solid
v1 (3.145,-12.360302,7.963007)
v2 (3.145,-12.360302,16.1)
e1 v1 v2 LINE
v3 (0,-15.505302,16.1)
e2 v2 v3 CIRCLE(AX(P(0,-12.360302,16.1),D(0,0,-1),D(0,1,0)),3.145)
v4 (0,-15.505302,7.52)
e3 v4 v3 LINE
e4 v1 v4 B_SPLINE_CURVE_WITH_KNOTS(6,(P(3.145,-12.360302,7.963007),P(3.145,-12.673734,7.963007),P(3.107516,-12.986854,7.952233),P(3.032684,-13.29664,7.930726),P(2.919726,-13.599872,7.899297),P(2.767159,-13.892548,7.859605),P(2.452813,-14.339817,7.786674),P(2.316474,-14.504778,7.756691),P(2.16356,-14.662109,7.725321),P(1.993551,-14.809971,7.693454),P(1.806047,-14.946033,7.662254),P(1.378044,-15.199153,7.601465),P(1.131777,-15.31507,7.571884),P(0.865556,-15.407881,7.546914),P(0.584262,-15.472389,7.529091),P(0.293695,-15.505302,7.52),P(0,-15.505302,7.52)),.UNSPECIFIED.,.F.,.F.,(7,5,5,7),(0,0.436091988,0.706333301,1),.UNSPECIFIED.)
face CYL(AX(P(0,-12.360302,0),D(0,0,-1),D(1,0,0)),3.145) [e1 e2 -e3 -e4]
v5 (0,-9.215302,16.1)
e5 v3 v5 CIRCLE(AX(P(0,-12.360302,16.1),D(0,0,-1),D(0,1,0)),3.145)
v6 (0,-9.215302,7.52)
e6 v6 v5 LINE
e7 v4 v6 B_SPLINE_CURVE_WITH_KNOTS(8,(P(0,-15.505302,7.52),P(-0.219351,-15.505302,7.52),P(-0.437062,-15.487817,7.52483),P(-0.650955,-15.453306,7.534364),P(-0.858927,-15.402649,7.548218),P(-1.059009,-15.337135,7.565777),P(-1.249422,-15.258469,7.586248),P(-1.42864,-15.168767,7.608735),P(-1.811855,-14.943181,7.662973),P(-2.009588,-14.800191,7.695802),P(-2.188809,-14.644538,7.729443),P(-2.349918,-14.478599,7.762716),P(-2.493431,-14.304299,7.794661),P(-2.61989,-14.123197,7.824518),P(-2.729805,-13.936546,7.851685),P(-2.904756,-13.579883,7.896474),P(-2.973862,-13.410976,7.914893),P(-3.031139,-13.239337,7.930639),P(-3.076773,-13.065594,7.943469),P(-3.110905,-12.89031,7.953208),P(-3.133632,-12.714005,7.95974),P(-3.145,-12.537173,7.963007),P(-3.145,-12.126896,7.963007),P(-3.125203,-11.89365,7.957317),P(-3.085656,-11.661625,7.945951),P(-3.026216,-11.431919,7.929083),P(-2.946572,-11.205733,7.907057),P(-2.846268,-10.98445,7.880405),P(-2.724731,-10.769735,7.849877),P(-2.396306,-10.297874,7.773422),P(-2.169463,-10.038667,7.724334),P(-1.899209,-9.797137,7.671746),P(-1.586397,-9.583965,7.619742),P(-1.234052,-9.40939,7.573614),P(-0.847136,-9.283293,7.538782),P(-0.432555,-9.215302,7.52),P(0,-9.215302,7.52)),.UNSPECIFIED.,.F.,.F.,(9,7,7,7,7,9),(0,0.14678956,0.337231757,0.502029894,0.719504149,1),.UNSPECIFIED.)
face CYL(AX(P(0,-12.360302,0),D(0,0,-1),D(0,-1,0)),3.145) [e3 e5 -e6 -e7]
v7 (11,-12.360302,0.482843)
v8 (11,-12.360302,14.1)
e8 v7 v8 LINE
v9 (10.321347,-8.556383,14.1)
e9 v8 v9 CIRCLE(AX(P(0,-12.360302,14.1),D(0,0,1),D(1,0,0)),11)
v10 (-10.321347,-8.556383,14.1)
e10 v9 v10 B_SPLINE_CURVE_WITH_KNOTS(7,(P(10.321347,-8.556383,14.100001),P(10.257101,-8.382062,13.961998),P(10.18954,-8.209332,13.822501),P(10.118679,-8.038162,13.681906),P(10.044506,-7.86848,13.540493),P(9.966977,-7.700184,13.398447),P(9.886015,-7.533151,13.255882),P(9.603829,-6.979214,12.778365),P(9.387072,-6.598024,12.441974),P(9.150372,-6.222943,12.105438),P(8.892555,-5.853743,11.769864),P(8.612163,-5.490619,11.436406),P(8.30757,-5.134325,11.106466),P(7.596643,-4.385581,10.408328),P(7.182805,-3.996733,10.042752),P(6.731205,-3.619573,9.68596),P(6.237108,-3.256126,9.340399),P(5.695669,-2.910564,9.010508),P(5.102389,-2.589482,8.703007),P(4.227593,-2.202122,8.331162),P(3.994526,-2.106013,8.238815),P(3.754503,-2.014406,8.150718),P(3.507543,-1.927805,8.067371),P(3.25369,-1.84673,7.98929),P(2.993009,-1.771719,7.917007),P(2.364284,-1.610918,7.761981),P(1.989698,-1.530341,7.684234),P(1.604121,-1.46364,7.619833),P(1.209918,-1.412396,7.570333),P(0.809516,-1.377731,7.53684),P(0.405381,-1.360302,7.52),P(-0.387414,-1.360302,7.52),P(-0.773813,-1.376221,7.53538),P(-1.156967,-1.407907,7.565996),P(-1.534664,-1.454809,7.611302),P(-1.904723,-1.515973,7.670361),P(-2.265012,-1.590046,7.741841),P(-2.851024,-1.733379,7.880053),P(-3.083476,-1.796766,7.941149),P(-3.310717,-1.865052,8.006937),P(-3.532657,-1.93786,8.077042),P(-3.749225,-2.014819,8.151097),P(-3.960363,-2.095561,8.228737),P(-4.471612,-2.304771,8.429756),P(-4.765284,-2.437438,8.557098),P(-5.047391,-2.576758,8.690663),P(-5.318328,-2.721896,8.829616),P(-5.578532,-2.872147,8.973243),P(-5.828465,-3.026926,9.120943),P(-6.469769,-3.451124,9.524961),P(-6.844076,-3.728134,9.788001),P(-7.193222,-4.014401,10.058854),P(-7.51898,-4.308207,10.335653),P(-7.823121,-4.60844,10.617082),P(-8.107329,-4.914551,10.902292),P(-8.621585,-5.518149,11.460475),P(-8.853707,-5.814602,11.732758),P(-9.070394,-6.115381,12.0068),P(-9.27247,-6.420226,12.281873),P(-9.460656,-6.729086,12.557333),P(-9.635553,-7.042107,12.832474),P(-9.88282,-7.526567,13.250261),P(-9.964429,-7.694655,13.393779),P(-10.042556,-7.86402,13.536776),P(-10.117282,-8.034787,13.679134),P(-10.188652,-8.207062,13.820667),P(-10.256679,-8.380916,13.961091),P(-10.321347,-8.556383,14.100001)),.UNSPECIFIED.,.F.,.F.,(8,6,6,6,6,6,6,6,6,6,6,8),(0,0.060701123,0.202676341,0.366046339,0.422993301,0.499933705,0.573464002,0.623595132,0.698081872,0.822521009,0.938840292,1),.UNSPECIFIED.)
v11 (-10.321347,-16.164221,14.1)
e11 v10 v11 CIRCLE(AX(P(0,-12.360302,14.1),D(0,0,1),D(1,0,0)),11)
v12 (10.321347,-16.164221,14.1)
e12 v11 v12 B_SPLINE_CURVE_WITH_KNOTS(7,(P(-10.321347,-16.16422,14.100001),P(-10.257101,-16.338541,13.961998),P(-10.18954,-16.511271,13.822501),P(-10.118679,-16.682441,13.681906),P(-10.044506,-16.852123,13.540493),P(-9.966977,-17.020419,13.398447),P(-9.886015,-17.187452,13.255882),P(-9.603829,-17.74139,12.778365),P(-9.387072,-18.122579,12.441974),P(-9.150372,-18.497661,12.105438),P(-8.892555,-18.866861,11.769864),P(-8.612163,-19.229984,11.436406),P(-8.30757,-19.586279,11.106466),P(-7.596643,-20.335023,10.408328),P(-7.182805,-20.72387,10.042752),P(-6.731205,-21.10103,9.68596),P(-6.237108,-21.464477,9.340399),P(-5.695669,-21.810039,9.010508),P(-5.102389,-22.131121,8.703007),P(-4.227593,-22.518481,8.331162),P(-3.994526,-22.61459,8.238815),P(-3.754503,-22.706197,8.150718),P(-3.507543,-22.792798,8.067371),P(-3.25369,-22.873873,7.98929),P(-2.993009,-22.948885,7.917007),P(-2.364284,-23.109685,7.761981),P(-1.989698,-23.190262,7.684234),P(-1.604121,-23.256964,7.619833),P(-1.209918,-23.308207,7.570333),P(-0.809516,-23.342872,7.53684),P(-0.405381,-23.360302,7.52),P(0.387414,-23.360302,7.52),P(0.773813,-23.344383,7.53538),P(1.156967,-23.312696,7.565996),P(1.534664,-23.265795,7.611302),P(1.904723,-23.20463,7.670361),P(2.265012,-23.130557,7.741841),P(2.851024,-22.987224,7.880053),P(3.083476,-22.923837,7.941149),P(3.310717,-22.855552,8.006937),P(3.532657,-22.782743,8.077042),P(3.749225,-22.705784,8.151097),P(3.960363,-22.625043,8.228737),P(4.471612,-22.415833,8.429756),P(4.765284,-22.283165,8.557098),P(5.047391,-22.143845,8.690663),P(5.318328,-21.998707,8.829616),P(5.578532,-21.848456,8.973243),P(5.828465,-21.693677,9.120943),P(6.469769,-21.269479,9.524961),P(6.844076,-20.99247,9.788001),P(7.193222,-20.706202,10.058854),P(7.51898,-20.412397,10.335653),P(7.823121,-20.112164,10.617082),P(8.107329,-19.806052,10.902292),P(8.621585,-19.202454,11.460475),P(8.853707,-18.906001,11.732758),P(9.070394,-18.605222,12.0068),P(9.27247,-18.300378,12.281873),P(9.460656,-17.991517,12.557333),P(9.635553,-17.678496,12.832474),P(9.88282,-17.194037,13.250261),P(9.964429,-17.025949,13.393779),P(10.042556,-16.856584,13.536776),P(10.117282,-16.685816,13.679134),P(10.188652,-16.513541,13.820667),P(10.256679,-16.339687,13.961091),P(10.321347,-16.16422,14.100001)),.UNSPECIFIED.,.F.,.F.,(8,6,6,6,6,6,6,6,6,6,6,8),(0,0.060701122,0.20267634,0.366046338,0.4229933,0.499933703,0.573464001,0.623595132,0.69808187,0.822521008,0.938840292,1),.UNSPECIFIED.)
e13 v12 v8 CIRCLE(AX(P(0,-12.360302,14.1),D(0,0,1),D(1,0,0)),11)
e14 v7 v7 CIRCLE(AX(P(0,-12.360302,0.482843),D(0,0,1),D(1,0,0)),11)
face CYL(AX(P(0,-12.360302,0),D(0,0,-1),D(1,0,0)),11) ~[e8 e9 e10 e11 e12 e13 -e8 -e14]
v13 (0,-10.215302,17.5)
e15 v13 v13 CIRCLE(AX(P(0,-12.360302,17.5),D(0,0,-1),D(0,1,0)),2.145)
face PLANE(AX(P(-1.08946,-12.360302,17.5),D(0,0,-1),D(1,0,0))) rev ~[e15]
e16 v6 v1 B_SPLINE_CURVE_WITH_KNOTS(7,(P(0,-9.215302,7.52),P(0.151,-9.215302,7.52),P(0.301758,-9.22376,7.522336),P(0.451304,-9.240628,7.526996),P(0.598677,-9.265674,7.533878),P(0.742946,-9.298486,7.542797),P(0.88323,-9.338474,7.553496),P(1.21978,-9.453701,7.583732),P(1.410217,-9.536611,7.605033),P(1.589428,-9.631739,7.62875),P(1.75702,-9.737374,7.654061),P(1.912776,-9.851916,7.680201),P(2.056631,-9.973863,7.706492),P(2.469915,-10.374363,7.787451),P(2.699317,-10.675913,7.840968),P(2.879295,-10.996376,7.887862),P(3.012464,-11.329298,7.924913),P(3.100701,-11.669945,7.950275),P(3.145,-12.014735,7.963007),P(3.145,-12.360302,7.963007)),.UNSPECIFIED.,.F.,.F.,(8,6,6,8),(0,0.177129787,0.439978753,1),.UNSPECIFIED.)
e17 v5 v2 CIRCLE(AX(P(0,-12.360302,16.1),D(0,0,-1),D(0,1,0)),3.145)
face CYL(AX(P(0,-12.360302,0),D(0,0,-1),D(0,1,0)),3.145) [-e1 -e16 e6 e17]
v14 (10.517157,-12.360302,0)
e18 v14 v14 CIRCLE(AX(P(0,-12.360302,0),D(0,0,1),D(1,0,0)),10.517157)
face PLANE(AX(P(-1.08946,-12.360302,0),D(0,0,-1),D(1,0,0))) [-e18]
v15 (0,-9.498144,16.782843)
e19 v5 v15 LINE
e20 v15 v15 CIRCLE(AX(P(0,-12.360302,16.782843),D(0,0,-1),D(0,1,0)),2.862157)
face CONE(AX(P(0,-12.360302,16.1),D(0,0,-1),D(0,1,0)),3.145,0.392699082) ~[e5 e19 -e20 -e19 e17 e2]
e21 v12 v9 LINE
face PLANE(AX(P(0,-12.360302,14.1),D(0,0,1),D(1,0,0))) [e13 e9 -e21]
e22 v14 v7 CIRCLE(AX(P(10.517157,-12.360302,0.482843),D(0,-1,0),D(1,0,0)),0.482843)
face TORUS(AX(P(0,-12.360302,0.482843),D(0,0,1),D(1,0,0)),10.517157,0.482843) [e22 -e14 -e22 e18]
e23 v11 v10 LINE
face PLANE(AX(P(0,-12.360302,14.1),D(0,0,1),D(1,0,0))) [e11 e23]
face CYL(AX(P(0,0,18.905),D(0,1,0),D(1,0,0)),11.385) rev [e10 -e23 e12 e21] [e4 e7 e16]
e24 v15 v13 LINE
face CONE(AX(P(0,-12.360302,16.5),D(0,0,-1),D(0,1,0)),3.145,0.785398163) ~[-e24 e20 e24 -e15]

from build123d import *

# Parameters (mm, degrees)
F0_R     = 11
F1_DEPTH = 14.1
F2_R     = 11.385
F3_DEPTH = 28.4
F5_DEPTH = 17.5
F7_R     = 0.4828427125


# Not quite as in the source:
# - a fillet or chamfer that OpenCascade refuses, or shapes differently, is made with other operations: its cross-section is extruded or revolved along the edge and cut away or added


with BuildPart() as f1:
    # F0 (on Top) → F1 (new body)
    with BuildSketch(Plane.XY):
        with Locations((0, -12.3603016903)):
            Circle(F0_R)
    extrude(amount=F1_DEPTH)

    # F2 (on Front) → F3 (cut)
    with BuildSketch(Plane.XZ):
        with Locations((0, 18.905)):
            Circle(F2_R)
    extrude(amount=F3_DEPTH, mode=Mode.SUBTRACT)

    # F4 (on face) → F5 (join)
    with BuildSketch(Plane(origin=(0, 0, 0), x_dir=(1, 0, 0), z_dir=(0, 0, -1))):
        with BuildLine():
            ThreePointArc((0, 15.5053016903), (-3.145, 12.3603016903), (0, 9.2153016903))
            Line((0, 9.2153016903), (0, 15.5053016903))
        make_face()
        with BuildLine():
            Line((0, 15.5053016903), (0, 9.2153016903))
            ThreePointArc((0, 9.2153016903), (2.2238508268, 10.1364508634), (3.145, 12.3603016903))
            ThreePointArc((3.145, 12.3603016903), (2.2238508268, 14.5841525171), (0, 15.5053016903))
        make_face()
    extrude(amount=-F5_DEPTH)

    # F6: chamfer of 1 on 1 edges, made by hand

    # F6_s1 → F6_t2 (revolve, cut)
    with BuildSketch(Plane.YZ):
        Polygon((-9.2153016903, 16.5), (-10.2153016903, 17.5), (-9.2153016903, 17.5), align=None)
    revolve(axis=Axis((0, -12.3603016903, 17.5), (0, 0, -1)), mode=Mode.SUBTRACT)

    # F7
    f7_edges = [f1.edges().sort_by_distance(p)[0] for p in [
        (-11, -12.360302, 0),
    ]]
    fillet(f7_edges, radius=F7_R)

    # F8: chamfer of 0.4 on 1 edges, made by hand

    # F8_s1 → F8_t2 (revolve, cut)
    with BuildSketch(Plane.YZ):
        Polygon((-9.2153016903, 16.1), (-9.4981444028, 16.7828427125), (-9.2153016903, 16.5), align=None)
    revolve(axis=Axis((0, -12.3603016903, 16.5), (0, 0, -1)), mode=Mode.SUBTRACT)


solid = f1.part
